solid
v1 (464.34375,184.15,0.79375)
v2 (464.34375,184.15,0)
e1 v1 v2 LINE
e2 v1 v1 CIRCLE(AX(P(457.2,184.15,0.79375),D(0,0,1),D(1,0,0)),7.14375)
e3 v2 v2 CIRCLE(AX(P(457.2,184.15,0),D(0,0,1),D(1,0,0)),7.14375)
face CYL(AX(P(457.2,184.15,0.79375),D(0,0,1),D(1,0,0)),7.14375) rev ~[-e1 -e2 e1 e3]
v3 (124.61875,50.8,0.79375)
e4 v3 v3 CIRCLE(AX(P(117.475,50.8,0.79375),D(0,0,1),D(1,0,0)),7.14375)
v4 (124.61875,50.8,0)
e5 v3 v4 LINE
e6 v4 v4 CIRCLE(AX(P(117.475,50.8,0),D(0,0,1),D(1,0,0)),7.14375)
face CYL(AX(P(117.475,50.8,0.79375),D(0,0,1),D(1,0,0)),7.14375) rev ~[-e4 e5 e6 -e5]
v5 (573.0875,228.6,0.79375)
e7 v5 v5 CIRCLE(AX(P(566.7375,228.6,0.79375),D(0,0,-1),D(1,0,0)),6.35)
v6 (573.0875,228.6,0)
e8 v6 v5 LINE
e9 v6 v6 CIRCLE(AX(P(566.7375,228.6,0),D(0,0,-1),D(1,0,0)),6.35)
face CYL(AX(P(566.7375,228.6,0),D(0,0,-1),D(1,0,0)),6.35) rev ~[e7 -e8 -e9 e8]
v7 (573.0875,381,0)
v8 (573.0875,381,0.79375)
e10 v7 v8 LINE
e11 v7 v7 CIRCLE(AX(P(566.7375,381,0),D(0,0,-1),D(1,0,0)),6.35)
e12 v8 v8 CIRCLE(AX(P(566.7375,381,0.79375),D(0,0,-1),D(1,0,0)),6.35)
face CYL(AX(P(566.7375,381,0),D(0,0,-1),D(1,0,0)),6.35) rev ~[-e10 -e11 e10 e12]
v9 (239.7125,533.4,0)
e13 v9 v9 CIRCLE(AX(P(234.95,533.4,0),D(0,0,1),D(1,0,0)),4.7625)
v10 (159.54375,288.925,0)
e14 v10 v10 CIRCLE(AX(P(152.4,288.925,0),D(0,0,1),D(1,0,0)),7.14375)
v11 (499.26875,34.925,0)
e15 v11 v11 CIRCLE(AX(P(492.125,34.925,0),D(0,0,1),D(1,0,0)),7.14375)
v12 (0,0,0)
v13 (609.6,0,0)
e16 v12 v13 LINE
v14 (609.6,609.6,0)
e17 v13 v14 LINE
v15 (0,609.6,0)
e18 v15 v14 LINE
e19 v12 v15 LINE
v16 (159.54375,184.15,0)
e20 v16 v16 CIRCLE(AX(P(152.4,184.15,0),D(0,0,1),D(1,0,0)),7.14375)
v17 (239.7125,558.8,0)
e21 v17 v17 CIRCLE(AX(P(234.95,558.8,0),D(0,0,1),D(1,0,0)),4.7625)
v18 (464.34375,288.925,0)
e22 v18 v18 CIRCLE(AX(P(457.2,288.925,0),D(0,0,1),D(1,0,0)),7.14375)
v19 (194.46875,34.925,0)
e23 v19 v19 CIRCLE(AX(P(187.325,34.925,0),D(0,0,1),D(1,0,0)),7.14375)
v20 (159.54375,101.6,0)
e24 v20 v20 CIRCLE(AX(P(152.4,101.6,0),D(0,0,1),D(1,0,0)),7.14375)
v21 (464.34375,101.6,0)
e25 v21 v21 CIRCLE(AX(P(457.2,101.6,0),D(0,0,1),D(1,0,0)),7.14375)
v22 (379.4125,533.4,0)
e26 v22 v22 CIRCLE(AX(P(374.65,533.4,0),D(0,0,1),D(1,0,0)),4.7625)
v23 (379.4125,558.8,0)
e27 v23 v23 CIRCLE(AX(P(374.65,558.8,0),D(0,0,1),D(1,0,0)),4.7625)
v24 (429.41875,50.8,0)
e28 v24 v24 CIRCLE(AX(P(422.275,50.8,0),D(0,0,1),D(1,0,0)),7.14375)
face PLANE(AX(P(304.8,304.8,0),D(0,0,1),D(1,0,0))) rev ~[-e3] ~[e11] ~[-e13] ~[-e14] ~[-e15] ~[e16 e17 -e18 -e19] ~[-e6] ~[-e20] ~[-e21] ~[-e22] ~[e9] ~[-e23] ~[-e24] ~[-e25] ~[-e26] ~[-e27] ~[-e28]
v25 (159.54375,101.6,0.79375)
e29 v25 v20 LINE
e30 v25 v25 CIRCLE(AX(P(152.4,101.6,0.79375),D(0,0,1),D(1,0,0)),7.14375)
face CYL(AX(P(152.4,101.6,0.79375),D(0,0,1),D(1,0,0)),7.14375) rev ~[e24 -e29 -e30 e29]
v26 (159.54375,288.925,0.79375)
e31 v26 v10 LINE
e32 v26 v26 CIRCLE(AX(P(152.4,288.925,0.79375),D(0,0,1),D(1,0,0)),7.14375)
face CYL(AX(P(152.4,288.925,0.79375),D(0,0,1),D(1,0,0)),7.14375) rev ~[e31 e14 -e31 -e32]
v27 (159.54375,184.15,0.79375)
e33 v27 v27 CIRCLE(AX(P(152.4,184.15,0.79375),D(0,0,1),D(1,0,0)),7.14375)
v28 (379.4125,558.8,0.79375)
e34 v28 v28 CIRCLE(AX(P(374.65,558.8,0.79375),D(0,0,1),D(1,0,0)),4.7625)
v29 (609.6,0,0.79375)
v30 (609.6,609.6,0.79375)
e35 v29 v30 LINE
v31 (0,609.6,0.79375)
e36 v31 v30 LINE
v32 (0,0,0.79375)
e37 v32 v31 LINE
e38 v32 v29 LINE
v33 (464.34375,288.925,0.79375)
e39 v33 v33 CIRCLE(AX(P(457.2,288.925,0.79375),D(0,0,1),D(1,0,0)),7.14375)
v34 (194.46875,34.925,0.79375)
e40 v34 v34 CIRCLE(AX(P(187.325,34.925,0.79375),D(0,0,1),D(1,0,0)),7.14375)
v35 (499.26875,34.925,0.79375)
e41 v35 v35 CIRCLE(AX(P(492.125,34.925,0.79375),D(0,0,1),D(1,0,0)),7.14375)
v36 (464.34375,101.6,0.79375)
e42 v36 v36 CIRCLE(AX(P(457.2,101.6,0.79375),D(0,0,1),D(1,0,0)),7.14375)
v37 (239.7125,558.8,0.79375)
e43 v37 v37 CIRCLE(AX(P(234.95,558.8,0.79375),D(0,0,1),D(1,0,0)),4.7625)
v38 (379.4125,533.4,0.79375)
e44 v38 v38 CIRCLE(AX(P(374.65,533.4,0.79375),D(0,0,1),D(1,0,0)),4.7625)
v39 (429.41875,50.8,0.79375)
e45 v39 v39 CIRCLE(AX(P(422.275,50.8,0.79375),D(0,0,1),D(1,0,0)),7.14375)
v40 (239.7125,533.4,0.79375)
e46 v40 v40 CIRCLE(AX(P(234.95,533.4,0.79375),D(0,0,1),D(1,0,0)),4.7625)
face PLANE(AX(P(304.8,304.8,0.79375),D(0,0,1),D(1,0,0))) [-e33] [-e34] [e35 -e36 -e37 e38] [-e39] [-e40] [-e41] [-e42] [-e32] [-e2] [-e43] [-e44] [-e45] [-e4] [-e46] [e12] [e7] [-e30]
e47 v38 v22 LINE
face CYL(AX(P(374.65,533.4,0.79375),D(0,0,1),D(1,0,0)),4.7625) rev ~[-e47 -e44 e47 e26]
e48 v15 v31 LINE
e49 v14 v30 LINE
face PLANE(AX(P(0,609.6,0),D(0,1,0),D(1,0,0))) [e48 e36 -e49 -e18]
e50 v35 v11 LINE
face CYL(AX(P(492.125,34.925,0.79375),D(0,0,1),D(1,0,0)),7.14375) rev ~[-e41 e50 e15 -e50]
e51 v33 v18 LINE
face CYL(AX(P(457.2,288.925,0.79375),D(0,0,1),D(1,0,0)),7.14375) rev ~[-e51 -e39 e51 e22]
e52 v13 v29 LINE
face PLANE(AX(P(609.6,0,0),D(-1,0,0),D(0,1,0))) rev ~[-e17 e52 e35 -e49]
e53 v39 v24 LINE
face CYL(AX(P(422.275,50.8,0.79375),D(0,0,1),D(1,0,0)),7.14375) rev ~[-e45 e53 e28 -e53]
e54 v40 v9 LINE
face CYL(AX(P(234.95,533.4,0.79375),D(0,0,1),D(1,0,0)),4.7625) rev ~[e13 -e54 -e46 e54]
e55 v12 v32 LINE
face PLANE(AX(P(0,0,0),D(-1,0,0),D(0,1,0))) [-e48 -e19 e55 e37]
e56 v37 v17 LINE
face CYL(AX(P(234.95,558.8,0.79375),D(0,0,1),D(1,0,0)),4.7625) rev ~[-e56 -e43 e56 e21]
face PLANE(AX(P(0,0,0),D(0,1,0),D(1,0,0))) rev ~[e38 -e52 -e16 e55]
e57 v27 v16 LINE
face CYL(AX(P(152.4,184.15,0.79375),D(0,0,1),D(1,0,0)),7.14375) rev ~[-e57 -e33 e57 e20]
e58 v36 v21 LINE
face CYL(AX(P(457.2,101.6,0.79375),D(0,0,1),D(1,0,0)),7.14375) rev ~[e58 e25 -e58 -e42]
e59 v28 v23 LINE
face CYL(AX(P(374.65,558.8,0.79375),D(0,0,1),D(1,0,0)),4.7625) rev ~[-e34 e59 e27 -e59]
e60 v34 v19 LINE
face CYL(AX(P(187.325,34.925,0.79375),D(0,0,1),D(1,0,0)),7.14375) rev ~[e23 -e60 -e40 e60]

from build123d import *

# Parameters (mm, degrees)
F0_W     = 609.6
F0_H     = 609.6
F1_DEPTH = 0.79375
F2_R     = 7.14375
F3_DEPTH = 25.4
F4_R     = 4.7625
F5_DEPTH = 25.4
F6_R     = 6.35
F7_DEPTH = 25.4


# Not quite as in the source:
# - a feature names something its author has since deleted; it is built from what else it names


with BuildPart() as f1:
    # F0 (on Top) → F1 (new body)
    with BuildSketch(Plane.XY):
        with Locations((304.8, 304.8)):
            Rectangle(F0_W, F0_H)
    extrude(amount=F1_DEPTH)

    # F2 (on face) → F3 (cut)
    with BuildSketch(Plane.XY.offset(0.79375)):
        with Locations((187.325, 34.925)):
            Circle(F2_R)
        with Locations((117.475, 50.8)):
            Circle(F2_R)
        with Locations((152.4, 101.6)):
            Circle(F2_R)
        with Locations((152.4, 184.15)):
            Circle(F2_R)
        with Locations((152.4, 288.925)):
            Circle(F2_R)
        with Locations((457.2, 288.925)):
            Circle(F2_R)
        with Locations((457.2, 184.15)):
            Circle(F2_R)
        with Locations((457.2, 101.6)):
            Circle(F2_R)
        with Locations((422.275, 50.8)):
            Circle(F2_R)
        with Locations((492.125, 34.925)):
            Circle(F2_R)
    extrude(amount=-F3_DEPTH, mode=Mode.SUBTRACT)

    # F4 (on face) → F5 (cut)
    with BuildSketch(Plane.XY.offset(0.79375)):
        with Locations((234.95, 558.8)):
            Circle(F4_R)
        with Locations((234.95, 533.4)):
            Circle(F4_R)
        with Locations((374.65, 533.4)):
            Circle(F4_R)
        with Locations((374.65, 558.8)):
            Circle(F4_R)
    extrude(amount=-F5_DEPTH, mode=Mode.SUBTRACT)

    # F6 (on face) → F7 (cut)
    with BuildSketch(Plane(origin=(0, 0, 0), x_dir=(1, 0, 0), z_dir=(0, 0, -1))):
        with Locations((566.7375, -381)):
            Circle(F6_R)
        with Locations((566.7375, -228.6)):
            Circle(F6_R)
    extrude(amount=-F7_DEPTH, mode=Mode.SUBTRACT)


solid = f1.part
